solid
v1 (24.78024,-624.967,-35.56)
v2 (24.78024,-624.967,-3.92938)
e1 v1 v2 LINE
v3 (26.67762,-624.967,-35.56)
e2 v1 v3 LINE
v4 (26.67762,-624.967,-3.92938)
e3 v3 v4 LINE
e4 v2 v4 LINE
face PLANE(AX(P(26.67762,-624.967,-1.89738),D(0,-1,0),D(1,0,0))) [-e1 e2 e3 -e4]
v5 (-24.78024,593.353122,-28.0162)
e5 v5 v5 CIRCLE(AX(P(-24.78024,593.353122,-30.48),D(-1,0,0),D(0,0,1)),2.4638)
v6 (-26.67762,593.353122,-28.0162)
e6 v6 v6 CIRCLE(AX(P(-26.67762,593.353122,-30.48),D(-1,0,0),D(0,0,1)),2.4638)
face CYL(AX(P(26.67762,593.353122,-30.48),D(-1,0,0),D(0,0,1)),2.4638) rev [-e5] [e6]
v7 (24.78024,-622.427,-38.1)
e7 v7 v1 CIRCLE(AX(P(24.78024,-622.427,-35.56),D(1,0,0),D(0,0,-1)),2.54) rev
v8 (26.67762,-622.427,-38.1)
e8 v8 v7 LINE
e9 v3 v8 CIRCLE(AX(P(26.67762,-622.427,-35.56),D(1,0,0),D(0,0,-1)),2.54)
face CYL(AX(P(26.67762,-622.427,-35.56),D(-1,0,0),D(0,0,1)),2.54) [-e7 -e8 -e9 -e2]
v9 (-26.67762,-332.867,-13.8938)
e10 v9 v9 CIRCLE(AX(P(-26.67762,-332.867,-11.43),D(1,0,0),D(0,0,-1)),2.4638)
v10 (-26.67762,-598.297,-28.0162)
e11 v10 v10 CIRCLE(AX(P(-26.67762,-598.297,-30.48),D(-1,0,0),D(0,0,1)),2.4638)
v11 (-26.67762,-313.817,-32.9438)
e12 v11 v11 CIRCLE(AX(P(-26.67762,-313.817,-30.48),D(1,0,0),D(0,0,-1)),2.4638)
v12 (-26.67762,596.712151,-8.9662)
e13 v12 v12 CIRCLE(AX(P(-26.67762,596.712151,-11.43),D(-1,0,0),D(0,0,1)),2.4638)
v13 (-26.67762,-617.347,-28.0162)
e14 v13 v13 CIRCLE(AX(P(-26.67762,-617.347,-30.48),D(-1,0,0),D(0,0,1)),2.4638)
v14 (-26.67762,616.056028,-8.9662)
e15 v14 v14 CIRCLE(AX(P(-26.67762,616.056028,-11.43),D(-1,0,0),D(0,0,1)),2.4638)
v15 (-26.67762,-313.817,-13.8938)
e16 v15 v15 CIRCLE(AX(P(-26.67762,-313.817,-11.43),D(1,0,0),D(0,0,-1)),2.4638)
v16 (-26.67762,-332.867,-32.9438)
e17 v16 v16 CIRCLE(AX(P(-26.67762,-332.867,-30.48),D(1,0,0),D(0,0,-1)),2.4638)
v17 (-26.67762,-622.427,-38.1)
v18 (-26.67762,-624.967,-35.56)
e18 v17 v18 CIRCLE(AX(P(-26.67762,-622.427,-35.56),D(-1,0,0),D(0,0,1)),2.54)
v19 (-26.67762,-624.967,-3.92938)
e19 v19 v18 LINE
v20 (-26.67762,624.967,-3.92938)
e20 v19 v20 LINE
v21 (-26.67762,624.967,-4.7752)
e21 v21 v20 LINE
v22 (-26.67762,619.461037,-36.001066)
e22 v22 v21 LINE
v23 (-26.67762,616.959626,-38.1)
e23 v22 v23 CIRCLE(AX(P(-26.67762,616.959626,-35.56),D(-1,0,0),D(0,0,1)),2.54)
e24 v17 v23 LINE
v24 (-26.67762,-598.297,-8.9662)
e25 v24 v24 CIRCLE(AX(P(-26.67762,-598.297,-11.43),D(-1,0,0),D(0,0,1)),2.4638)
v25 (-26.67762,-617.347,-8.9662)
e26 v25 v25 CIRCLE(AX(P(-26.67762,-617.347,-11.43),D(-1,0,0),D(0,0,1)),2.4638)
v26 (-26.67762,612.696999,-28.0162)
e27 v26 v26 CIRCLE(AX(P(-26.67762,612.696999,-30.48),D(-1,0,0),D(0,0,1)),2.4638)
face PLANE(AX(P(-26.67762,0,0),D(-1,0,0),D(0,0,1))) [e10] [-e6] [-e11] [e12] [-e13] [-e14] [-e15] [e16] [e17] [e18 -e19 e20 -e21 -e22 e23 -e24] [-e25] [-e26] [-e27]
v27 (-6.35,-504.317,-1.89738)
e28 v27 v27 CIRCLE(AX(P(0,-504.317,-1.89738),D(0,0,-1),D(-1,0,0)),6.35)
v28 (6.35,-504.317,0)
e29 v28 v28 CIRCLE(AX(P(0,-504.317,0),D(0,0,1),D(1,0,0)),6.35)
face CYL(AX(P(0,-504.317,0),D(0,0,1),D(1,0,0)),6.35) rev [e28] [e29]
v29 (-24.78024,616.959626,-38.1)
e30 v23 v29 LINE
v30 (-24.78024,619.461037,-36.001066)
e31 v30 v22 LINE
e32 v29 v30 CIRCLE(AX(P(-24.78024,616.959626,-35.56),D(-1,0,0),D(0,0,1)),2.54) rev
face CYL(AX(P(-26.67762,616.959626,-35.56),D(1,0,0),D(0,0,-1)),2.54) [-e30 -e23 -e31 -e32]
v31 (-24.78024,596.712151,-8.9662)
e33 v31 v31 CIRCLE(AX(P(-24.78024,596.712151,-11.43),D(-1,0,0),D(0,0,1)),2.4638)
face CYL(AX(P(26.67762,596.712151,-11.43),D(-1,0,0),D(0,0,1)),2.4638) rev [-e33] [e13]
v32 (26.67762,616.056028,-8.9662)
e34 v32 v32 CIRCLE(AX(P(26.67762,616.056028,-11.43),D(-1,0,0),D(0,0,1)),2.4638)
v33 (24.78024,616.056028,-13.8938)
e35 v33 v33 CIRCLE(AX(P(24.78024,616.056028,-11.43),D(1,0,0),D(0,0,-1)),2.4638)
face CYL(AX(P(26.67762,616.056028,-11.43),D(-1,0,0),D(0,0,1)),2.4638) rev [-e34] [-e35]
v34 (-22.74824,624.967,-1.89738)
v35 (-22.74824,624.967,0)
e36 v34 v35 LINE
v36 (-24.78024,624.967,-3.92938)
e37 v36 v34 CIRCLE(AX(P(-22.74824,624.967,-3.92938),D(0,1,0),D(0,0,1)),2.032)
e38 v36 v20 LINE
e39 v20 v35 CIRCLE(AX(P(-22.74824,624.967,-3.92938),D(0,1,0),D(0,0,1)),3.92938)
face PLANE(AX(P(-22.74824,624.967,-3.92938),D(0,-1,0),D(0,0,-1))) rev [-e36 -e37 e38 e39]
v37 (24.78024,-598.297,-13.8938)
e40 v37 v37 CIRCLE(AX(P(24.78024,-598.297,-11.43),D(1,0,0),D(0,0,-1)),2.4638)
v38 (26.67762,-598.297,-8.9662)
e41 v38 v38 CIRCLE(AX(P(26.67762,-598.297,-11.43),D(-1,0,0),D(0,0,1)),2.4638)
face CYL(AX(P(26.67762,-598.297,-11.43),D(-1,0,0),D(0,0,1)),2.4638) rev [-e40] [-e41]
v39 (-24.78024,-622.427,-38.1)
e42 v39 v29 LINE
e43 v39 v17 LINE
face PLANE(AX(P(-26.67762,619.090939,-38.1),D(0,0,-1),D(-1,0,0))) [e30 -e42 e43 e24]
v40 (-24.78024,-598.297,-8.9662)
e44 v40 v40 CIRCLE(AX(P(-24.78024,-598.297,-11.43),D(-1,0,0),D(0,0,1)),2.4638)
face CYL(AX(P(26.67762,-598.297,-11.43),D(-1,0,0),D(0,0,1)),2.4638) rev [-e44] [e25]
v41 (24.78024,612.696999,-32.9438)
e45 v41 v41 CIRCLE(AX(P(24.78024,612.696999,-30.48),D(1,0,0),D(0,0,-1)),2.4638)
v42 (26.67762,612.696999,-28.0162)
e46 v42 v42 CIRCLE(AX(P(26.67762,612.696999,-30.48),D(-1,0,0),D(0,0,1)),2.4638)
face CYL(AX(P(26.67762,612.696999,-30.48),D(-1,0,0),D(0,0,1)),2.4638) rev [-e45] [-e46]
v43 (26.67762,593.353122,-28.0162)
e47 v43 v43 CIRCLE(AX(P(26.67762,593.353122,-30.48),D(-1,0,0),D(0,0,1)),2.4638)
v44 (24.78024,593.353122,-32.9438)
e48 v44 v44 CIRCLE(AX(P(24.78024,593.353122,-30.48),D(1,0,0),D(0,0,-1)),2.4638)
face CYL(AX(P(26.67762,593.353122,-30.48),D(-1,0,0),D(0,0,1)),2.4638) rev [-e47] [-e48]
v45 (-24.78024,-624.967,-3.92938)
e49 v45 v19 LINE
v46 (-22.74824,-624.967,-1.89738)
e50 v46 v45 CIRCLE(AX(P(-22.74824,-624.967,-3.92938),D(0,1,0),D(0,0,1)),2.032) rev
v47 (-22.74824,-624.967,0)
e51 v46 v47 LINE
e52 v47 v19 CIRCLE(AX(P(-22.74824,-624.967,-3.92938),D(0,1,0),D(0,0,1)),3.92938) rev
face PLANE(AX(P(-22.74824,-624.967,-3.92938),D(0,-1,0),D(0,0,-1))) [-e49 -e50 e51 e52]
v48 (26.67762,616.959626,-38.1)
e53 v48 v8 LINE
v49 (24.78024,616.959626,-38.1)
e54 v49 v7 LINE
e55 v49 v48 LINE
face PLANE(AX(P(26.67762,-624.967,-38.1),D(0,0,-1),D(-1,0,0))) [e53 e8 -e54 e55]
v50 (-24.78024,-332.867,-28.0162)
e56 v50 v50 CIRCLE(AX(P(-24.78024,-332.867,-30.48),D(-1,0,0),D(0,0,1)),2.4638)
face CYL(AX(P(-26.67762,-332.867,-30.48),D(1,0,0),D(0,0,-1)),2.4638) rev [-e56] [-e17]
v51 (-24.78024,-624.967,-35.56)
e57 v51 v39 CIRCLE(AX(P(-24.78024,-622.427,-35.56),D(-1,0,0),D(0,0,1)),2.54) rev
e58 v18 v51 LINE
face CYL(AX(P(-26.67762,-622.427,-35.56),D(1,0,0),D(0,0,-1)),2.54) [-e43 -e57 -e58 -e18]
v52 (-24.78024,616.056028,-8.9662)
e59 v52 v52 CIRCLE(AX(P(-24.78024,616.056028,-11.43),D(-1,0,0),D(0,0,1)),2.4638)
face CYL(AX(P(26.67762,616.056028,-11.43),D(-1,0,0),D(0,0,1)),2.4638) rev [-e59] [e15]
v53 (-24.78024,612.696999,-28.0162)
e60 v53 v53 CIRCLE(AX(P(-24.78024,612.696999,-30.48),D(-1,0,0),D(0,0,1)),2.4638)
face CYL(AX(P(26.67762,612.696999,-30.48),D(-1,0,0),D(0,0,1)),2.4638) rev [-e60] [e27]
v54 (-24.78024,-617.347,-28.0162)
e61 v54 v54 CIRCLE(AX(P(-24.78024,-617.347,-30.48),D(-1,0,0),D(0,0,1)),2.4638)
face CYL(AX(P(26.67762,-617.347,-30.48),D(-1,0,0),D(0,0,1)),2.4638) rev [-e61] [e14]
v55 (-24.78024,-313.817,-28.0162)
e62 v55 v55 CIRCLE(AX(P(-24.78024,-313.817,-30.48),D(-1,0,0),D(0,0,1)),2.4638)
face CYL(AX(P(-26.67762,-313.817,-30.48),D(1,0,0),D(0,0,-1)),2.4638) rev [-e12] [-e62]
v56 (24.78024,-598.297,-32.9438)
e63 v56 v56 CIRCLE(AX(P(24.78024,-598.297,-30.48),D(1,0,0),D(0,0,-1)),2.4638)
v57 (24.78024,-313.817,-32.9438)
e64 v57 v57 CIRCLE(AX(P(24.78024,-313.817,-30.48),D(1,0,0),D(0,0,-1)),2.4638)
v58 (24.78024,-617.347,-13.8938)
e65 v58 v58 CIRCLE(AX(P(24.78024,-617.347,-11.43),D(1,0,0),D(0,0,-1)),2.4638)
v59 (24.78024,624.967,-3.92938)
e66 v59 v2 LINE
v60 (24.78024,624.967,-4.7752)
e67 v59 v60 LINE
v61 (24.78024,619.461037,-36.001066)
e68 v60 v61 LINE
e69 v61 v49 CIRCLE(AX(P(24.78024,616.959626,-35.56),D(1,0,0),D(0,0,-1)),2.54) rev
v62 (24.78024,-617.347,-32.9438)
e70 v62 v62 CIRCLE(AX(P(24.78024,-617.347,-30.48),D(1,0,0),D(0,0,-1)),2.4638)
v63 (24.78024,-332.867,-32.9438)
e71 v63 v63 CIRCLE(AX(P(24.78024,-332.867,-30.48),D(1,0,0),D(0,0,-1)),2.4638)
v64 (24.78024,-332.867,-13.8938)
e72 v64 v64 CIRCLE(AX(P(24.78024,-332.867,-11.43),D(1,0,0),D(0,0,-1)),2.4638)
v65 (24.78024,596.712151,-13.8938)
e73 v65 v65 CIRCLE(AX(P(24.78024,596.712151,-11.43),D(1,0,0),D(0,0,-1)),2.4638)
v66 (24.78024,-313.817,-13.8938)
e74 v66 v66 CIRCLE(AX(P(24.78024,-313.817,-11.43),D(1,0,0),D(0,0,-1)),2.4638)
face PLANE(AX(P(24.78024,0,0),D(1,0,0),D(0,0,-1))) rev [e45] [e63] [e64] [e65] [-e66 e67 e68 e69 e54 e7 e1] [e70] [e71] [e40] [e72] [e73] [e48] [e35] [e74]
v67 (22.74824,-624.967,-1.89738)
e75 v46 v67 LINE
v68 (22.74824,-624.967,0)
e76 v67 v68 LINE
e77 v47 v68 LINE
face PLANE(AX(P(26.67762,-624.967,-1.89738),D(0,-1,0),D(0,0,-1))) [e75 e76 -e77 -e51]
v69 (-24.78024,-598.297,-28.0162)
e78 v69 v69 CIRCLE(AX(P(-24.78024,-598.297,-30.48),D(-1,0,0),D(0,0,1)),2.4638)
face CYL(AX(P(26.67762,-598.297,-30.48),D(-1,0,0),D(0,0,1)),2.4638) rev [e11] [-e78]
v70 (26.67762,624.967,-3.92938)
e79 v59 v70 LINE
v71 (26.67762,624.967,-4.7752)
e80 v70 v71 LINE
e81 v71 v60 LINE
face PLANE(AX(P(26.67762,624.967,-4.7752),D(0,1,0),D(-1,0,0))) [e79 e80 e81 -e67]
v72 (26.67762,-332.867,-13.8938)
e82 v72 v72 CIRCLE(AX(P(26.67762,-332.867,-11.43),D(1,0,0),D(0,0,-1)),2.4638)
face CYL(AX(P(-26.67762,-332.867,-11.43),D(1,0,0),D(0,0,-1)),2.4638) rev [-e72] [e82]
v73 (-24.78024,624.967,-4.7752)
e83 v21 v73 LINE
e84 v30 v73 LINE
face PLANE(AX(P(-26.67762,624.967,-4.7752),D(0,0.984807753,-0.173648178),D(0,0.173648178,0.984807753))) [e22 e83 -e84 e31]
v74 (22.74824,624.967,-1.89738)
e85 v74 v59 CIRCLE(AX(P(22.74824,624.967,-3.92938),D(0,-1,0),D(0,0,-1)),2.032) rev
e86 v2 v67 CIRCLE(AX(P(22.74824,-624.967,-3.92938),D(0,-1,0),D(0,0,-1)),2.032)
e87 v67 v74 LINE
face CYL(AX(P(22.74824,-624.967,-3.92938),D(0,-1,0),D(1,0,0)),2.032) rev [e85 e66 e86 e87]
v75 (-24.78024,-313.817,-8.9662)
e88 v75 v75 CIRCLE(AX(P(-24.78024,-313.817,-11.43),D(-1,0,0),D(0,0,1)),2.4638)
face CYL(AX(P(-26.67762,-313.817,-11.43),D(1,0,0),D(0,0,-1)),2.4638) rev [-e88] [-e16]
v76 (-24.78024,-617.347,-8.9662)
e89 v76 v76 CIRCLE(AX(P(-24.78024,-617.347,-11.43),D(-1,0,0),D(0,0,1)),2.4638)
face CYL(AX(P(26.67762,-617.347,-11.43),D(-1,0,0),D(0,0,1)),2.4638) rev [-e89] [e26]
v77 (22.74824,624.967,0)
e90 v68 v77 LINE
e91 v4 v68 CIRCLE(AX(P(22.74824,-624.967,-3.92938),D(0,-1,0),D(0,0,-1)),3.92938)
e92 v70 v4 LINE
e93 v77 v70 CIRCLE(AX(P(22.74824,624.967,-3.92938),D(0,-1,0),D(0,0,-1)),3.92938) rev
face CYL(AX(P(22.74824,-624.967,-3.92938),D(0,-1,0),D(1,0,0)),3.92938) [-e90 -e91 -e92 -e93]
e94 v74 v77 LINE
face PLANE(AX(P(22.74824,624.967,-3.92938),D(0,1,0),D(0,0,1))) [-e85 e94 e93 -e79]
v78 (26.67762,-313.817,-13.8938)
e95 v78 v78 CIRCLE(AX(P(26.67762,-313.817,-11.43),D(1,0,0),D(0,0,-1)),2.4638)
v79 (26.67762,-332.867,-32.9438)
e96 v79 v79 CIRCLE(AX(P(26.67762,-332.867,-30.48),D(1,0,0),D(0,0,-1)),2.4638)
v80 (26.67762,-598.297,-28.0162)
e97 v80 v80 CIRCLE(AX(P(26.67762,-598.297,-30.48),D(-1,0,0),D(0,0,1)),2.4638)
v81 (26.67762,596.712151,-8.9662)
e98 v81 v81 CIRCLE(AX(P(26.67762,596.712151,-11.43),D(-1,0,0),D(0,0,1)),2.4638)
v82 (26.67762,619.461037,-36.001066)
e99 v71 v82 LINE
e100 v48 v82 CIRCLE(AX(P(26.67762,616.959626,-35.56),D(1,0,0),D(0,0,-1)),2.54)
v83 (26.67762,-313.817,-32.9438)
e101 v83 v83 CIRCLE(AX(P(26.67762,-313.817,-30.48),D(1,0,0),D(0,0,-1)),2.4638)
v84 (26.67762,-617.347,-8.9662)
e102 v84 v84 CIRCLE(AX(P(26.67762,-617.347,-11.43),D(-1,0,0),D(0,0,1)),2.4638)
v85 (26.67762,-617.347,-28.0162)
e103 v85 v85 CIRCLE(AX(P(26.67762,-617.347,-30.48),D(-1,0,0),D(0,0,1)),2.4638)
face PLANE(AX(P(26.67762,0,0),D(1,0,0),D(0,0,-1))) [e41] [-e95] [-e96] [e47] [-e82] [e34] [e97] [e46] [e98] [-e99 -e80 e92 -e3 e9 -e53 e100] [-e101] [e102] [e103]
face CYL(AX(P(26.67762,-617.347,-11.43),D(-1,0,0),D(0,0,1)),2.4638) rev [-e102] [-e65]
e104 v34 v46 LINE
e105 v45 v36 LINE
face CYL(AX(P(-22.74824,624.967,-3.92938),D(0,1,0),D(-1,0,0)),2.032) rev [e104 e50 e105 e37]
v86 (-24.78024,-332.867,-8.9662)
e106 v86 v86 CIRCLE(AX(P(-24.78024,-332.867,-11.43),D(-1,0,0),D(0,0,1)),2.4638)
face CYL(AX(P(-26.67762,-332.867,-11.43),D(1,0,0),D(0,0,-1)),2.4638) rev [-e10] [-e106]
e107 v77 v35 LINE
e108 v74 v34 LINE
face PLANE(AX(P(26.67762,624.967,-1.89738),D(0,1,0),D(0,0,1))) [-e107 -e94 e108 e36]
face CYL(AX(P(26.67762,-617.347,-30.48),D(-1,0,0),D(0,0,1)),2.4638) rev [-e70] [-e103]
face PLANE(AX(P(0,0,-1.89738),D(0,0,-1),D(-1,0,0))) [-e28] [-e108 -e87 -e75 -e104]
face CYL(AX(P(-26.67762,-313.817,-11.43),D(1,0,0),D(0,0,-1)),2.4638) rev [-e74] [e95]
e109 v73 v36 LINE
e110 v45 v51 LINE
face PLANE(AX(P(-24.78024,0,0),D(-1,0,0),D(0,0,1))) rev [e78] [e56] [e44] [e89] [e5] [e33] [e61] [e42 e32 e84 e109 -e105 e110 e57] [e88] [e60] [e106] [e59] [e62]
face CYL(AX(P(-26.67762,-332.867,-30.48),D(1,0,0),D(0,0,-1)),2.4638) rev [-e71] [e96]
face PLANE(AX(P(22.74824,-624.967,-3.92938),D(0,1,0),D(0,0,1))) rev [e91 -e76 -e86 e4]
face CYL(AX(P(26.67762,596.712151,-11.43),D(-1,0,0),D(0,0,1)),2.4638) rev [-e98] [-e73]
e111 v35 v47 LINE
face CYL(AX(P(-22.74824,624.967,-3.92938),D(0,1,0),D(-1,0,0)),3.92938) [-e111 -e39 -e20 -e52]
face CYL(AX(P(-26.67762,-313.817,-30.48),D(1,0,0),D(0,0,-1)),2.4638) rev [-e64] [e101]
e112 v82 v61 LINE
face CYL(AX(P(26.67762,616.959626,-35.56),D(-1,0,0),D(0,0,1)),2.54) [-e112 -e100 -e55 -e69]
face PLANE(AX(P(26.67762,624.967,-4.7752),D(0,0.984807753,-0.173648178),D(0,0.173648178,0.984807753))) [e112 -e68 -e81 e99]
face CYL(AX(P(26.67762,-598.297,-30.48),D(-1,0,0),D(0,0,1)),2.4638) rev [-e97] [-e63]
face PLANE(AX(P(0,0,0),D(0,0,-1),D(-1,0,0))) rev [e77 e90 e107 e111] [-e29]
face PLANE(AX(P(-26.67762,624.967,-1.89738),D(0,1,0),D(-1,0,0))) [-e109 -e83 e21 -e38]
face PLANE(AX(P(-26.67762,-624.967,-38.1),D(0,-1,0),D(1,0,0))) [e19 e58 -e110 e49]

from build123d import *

# Parameters (mm, degrees)
SKETCH1_W                    = 53.35524
SKETCH1_H                    = 1249.934
BASE_FLANGE1_DEPTH           = 1.89738
EDGE_FLANGE1_STRIP_W         = 11.65352
EDGE_FLANGE1_STRIP_H         = 1.89738
EDGE_FLANGE1_STRIP_CUT_DEPTH = 1249.934
EDGE_FLANGE1_DEPTH           = 1249.934
EDGE_FLANGE1_FLAT_DEPTH      = 1.89738
EDGE_FLANGE2_STRIP_W         = 11.65352
EDGE_FLANGE2_STRIP_H         = 1.89738
EDGE_FLANGE2_STRIP_CUT_DEPTH = 1249.934
EDGE_FLANGE2_DEPTH           = 1249.934
EDGE_FLANGE2_FLAT_DEPTH      = 1.89738
FILLET1_R                    = 2.54
SKETCH12_R                   = 2.4638
CUT_EXTRUDE1_DEPTH           = 629.39648529
SKETCH13_R                   = 2.4638
CUT_EXTRUDE2_DEPTH           = 629.39648529
SKETCH14_R                   = 2.4638
CUT_EXTRUDE3_DEPTH           = 629.39648529
F_1_2_0_5_DIAMETER_HOLE1_D   = 12.7


# Sheet-metal steps are written as plain solids
with BuildPart() as part:
    # Sketch1 → Base-Flange1 (new body)
    with BuildSketch(Plane.XY):
        Rectangle(SKETCH1_W, SKETCH1_H)
    extrude(amount=-BASE_FLANGE1_DEPTH)

    # Edge-Flange1 strip (across the edge) → Edge-Flange1 strip cut (cut)
    with BuildSketch(Plane(origin=(26.67762, 624.967, -1.89738), x_dir=(-1, 0, 0), z_dir=(0, -1, 0))):
        with Locations((-1.89738, -0.94869)):
            Rectangle(EDGE_FLANGE1_STRIP_W, EDGE_FLANGE1_STRIP_H)
    extrude(amount=EDGE_FLANGE1_STRIP_CUT_DEPTH, mode=Mode.SUBTRACT)

    # Edge-Flange1 bend section (across the edge) → Edge-Flange1 (add)
    with BuildSketch(Plane(origin=(26.67762, 624.967, -1.89738), x_dir=(-1, 0, 0), z_dir=(0, -1, 0))):
        with BuildLine():
            Line((0, 2.032), (1.89738, 2.032))
            ThreePointArc((1.89738, 2.032), (2.492539021, 0.595159021), (3.92938, 0))
            Line((3.92938, 0), (3.92938, -1.89738))
            ThreePointArc((3.92938, -1.89738), (1.150888756, -0.746491244), (0, 2.032))
        make_face()
    extrude(amount=EDGE_FLANGE1_DEPTH)

    # Edge-Flange1 profile (on flange) → Edge-Flange1 flat (add)
    with BuildSketch(Plane(origin=(26.67762, 0, -1.89738), x_dir=(0, 1, 0), z_dir=(-1, 0, 0))):
        Polygon((624.967, 2.032), (624.967, 2.87782), (619.090938633, 36.20262), (-624.967, 36.20262), (-624.967, 2.032), align=None)
    extrude(amount=EDGE_FLANGE1_FLAT_DEPTH)

    # Edge-Flange2 strip (across the edge) → Edge-Flange2 strip cut (cut)
    with BuildSketch(Plane(origin=(-26.67762, -624.967, -1.89738), x_dir=(1, 0, 0), z_dir=(0, 1, 0))):
        with Locations((-1.89738, -0.94869)):
            Rectangle(EDGE_FLANGE2_STRIP_W, EDGE_FLANGE2_STRIP_H)
    extrude(amount=EDGE_FLANGE2_STRIP_CUT_DEPTH, mode=Mode.SUBTRACT)

    # Edge-Flange2 bend section (across the edge) → Edge-Flange2 (add)
    with BuildSketch(Plane(origin=(-26.67762, -624.967, -1.89738), x_dir=(1, 0, 0), z_dir=(0, 1, 0))):
        with BuildLine():
            Line((0, 2.032), (1.89738, 2.032))
            ThreePointArc((1.89738, 2.032), (2.492539021, 0.595159021), (3.92938, 0))
            Line((3.92938, 0), (3.92938, -1.89738))
            ThreePointArc((3.92938, -1.89738), (1.150888756, -0.746491244), (0, 2.032))
        make_face()
    extrude(amount=EDGE_FLANGE2_DEPTH)

    # Edge-Flange2 profile (on flange) → Edge-Flange2 flat (add)
    with BuildSketch(Plane(origin=(-26.67762, 0, -1.89738), x_dir=(0, -1, 0), z_dir=(1, 0, 0))):
        Polygon((-624.967, 2.87782), (-624.967, 2.032), (624.967, 2.032), (624.967, 36.20262), (-619.090938633, 36.20262), align=None)
    extrude(amount=EDGE_FLANGE2_FLAT_DEPTH)

    # Fillet1
    fillet1_edges = [part.edges().sort_by_distance(p)[0] for p in [
        (25.72893, -624.967, -38.1),
        (25.72893, 619.090938633, -38.1),
        (-25.72893, -624.967, -38.1),
        (-25.72893, 619.090938633, -38.1),
    ]]
    fillet(fillet1_edges, radius=FILLET1_R)

    # Sketch12 → Cut-Extrude1 (cut, through all)
    with BuildSketch(Plane.ZY.offset(26.67762)):
        with Locations((-30.48, -617.347)):
            Circle(SKETCH12_R)
        with Locations((-30.48, -598.297)):
            Circle(SKETCH12_R)
        with Locations((-11.43, -598.297)):
            Circle(SKETCH12_R)
        with Locations((-11.43, -617.347)):
            Circle(SKETCH12_R)
    extrude(amount=-CUT_EXTRUDE1_DEPTH, mode=Mode.SUBTRACT)

    # Sketch13 → Cut-Extrude2 (cut, through all)
    with BuildSketch(Plane.ZY.offset(26.67762)):
        with Locations((-30.48, 612.696999444)):
            Circle(SKETCH13_R)
        with Locations((-11.43, 616.056028426)):
            Circle(SKETCH13_R)
        with Locations((-11.43, 596.71215147)):
            Circle(SKETCH13_R)
        with Locations((-30.48, 593.353122487)):
            Circle(SKETCH13_R)
    extrude(amount=-CUT_EXTRUDE2_DEPTH, mode=Mode.SUBTRACT)

    # Sketch14 → Cut-Extrude3 (cut, through all)
    with BuildSketch(Plane(origin=(26.67762, 0, 0), x_dir=(0, 0, -1), z_dir=(1, 0, 0))):
        with Locations((11.43, -313.817)):
            Circle(SKETCH14_R)
        with Locations((11.43, -332.867)):
            Circle(SKETCH14_R)
        with Locations((30.48, -332.867)):
            Circle(SKETCH14_R)
        with Locations((30.48, -313.817)):
            Circle(SKETCH14_R)
    extrude(amount=-CUT_EXTRUDE3_DEPTH, mode=Mode.SUBTRACT)

    # 1/2 (0.5) Diameter Hole1 (through all)
    with Locations(Plane.XY):
        with Locations((0, -504.317)):
            Hole(F_1_2_0_5_DIAMETER_HOLE1_D / 2)


solid = part.part
